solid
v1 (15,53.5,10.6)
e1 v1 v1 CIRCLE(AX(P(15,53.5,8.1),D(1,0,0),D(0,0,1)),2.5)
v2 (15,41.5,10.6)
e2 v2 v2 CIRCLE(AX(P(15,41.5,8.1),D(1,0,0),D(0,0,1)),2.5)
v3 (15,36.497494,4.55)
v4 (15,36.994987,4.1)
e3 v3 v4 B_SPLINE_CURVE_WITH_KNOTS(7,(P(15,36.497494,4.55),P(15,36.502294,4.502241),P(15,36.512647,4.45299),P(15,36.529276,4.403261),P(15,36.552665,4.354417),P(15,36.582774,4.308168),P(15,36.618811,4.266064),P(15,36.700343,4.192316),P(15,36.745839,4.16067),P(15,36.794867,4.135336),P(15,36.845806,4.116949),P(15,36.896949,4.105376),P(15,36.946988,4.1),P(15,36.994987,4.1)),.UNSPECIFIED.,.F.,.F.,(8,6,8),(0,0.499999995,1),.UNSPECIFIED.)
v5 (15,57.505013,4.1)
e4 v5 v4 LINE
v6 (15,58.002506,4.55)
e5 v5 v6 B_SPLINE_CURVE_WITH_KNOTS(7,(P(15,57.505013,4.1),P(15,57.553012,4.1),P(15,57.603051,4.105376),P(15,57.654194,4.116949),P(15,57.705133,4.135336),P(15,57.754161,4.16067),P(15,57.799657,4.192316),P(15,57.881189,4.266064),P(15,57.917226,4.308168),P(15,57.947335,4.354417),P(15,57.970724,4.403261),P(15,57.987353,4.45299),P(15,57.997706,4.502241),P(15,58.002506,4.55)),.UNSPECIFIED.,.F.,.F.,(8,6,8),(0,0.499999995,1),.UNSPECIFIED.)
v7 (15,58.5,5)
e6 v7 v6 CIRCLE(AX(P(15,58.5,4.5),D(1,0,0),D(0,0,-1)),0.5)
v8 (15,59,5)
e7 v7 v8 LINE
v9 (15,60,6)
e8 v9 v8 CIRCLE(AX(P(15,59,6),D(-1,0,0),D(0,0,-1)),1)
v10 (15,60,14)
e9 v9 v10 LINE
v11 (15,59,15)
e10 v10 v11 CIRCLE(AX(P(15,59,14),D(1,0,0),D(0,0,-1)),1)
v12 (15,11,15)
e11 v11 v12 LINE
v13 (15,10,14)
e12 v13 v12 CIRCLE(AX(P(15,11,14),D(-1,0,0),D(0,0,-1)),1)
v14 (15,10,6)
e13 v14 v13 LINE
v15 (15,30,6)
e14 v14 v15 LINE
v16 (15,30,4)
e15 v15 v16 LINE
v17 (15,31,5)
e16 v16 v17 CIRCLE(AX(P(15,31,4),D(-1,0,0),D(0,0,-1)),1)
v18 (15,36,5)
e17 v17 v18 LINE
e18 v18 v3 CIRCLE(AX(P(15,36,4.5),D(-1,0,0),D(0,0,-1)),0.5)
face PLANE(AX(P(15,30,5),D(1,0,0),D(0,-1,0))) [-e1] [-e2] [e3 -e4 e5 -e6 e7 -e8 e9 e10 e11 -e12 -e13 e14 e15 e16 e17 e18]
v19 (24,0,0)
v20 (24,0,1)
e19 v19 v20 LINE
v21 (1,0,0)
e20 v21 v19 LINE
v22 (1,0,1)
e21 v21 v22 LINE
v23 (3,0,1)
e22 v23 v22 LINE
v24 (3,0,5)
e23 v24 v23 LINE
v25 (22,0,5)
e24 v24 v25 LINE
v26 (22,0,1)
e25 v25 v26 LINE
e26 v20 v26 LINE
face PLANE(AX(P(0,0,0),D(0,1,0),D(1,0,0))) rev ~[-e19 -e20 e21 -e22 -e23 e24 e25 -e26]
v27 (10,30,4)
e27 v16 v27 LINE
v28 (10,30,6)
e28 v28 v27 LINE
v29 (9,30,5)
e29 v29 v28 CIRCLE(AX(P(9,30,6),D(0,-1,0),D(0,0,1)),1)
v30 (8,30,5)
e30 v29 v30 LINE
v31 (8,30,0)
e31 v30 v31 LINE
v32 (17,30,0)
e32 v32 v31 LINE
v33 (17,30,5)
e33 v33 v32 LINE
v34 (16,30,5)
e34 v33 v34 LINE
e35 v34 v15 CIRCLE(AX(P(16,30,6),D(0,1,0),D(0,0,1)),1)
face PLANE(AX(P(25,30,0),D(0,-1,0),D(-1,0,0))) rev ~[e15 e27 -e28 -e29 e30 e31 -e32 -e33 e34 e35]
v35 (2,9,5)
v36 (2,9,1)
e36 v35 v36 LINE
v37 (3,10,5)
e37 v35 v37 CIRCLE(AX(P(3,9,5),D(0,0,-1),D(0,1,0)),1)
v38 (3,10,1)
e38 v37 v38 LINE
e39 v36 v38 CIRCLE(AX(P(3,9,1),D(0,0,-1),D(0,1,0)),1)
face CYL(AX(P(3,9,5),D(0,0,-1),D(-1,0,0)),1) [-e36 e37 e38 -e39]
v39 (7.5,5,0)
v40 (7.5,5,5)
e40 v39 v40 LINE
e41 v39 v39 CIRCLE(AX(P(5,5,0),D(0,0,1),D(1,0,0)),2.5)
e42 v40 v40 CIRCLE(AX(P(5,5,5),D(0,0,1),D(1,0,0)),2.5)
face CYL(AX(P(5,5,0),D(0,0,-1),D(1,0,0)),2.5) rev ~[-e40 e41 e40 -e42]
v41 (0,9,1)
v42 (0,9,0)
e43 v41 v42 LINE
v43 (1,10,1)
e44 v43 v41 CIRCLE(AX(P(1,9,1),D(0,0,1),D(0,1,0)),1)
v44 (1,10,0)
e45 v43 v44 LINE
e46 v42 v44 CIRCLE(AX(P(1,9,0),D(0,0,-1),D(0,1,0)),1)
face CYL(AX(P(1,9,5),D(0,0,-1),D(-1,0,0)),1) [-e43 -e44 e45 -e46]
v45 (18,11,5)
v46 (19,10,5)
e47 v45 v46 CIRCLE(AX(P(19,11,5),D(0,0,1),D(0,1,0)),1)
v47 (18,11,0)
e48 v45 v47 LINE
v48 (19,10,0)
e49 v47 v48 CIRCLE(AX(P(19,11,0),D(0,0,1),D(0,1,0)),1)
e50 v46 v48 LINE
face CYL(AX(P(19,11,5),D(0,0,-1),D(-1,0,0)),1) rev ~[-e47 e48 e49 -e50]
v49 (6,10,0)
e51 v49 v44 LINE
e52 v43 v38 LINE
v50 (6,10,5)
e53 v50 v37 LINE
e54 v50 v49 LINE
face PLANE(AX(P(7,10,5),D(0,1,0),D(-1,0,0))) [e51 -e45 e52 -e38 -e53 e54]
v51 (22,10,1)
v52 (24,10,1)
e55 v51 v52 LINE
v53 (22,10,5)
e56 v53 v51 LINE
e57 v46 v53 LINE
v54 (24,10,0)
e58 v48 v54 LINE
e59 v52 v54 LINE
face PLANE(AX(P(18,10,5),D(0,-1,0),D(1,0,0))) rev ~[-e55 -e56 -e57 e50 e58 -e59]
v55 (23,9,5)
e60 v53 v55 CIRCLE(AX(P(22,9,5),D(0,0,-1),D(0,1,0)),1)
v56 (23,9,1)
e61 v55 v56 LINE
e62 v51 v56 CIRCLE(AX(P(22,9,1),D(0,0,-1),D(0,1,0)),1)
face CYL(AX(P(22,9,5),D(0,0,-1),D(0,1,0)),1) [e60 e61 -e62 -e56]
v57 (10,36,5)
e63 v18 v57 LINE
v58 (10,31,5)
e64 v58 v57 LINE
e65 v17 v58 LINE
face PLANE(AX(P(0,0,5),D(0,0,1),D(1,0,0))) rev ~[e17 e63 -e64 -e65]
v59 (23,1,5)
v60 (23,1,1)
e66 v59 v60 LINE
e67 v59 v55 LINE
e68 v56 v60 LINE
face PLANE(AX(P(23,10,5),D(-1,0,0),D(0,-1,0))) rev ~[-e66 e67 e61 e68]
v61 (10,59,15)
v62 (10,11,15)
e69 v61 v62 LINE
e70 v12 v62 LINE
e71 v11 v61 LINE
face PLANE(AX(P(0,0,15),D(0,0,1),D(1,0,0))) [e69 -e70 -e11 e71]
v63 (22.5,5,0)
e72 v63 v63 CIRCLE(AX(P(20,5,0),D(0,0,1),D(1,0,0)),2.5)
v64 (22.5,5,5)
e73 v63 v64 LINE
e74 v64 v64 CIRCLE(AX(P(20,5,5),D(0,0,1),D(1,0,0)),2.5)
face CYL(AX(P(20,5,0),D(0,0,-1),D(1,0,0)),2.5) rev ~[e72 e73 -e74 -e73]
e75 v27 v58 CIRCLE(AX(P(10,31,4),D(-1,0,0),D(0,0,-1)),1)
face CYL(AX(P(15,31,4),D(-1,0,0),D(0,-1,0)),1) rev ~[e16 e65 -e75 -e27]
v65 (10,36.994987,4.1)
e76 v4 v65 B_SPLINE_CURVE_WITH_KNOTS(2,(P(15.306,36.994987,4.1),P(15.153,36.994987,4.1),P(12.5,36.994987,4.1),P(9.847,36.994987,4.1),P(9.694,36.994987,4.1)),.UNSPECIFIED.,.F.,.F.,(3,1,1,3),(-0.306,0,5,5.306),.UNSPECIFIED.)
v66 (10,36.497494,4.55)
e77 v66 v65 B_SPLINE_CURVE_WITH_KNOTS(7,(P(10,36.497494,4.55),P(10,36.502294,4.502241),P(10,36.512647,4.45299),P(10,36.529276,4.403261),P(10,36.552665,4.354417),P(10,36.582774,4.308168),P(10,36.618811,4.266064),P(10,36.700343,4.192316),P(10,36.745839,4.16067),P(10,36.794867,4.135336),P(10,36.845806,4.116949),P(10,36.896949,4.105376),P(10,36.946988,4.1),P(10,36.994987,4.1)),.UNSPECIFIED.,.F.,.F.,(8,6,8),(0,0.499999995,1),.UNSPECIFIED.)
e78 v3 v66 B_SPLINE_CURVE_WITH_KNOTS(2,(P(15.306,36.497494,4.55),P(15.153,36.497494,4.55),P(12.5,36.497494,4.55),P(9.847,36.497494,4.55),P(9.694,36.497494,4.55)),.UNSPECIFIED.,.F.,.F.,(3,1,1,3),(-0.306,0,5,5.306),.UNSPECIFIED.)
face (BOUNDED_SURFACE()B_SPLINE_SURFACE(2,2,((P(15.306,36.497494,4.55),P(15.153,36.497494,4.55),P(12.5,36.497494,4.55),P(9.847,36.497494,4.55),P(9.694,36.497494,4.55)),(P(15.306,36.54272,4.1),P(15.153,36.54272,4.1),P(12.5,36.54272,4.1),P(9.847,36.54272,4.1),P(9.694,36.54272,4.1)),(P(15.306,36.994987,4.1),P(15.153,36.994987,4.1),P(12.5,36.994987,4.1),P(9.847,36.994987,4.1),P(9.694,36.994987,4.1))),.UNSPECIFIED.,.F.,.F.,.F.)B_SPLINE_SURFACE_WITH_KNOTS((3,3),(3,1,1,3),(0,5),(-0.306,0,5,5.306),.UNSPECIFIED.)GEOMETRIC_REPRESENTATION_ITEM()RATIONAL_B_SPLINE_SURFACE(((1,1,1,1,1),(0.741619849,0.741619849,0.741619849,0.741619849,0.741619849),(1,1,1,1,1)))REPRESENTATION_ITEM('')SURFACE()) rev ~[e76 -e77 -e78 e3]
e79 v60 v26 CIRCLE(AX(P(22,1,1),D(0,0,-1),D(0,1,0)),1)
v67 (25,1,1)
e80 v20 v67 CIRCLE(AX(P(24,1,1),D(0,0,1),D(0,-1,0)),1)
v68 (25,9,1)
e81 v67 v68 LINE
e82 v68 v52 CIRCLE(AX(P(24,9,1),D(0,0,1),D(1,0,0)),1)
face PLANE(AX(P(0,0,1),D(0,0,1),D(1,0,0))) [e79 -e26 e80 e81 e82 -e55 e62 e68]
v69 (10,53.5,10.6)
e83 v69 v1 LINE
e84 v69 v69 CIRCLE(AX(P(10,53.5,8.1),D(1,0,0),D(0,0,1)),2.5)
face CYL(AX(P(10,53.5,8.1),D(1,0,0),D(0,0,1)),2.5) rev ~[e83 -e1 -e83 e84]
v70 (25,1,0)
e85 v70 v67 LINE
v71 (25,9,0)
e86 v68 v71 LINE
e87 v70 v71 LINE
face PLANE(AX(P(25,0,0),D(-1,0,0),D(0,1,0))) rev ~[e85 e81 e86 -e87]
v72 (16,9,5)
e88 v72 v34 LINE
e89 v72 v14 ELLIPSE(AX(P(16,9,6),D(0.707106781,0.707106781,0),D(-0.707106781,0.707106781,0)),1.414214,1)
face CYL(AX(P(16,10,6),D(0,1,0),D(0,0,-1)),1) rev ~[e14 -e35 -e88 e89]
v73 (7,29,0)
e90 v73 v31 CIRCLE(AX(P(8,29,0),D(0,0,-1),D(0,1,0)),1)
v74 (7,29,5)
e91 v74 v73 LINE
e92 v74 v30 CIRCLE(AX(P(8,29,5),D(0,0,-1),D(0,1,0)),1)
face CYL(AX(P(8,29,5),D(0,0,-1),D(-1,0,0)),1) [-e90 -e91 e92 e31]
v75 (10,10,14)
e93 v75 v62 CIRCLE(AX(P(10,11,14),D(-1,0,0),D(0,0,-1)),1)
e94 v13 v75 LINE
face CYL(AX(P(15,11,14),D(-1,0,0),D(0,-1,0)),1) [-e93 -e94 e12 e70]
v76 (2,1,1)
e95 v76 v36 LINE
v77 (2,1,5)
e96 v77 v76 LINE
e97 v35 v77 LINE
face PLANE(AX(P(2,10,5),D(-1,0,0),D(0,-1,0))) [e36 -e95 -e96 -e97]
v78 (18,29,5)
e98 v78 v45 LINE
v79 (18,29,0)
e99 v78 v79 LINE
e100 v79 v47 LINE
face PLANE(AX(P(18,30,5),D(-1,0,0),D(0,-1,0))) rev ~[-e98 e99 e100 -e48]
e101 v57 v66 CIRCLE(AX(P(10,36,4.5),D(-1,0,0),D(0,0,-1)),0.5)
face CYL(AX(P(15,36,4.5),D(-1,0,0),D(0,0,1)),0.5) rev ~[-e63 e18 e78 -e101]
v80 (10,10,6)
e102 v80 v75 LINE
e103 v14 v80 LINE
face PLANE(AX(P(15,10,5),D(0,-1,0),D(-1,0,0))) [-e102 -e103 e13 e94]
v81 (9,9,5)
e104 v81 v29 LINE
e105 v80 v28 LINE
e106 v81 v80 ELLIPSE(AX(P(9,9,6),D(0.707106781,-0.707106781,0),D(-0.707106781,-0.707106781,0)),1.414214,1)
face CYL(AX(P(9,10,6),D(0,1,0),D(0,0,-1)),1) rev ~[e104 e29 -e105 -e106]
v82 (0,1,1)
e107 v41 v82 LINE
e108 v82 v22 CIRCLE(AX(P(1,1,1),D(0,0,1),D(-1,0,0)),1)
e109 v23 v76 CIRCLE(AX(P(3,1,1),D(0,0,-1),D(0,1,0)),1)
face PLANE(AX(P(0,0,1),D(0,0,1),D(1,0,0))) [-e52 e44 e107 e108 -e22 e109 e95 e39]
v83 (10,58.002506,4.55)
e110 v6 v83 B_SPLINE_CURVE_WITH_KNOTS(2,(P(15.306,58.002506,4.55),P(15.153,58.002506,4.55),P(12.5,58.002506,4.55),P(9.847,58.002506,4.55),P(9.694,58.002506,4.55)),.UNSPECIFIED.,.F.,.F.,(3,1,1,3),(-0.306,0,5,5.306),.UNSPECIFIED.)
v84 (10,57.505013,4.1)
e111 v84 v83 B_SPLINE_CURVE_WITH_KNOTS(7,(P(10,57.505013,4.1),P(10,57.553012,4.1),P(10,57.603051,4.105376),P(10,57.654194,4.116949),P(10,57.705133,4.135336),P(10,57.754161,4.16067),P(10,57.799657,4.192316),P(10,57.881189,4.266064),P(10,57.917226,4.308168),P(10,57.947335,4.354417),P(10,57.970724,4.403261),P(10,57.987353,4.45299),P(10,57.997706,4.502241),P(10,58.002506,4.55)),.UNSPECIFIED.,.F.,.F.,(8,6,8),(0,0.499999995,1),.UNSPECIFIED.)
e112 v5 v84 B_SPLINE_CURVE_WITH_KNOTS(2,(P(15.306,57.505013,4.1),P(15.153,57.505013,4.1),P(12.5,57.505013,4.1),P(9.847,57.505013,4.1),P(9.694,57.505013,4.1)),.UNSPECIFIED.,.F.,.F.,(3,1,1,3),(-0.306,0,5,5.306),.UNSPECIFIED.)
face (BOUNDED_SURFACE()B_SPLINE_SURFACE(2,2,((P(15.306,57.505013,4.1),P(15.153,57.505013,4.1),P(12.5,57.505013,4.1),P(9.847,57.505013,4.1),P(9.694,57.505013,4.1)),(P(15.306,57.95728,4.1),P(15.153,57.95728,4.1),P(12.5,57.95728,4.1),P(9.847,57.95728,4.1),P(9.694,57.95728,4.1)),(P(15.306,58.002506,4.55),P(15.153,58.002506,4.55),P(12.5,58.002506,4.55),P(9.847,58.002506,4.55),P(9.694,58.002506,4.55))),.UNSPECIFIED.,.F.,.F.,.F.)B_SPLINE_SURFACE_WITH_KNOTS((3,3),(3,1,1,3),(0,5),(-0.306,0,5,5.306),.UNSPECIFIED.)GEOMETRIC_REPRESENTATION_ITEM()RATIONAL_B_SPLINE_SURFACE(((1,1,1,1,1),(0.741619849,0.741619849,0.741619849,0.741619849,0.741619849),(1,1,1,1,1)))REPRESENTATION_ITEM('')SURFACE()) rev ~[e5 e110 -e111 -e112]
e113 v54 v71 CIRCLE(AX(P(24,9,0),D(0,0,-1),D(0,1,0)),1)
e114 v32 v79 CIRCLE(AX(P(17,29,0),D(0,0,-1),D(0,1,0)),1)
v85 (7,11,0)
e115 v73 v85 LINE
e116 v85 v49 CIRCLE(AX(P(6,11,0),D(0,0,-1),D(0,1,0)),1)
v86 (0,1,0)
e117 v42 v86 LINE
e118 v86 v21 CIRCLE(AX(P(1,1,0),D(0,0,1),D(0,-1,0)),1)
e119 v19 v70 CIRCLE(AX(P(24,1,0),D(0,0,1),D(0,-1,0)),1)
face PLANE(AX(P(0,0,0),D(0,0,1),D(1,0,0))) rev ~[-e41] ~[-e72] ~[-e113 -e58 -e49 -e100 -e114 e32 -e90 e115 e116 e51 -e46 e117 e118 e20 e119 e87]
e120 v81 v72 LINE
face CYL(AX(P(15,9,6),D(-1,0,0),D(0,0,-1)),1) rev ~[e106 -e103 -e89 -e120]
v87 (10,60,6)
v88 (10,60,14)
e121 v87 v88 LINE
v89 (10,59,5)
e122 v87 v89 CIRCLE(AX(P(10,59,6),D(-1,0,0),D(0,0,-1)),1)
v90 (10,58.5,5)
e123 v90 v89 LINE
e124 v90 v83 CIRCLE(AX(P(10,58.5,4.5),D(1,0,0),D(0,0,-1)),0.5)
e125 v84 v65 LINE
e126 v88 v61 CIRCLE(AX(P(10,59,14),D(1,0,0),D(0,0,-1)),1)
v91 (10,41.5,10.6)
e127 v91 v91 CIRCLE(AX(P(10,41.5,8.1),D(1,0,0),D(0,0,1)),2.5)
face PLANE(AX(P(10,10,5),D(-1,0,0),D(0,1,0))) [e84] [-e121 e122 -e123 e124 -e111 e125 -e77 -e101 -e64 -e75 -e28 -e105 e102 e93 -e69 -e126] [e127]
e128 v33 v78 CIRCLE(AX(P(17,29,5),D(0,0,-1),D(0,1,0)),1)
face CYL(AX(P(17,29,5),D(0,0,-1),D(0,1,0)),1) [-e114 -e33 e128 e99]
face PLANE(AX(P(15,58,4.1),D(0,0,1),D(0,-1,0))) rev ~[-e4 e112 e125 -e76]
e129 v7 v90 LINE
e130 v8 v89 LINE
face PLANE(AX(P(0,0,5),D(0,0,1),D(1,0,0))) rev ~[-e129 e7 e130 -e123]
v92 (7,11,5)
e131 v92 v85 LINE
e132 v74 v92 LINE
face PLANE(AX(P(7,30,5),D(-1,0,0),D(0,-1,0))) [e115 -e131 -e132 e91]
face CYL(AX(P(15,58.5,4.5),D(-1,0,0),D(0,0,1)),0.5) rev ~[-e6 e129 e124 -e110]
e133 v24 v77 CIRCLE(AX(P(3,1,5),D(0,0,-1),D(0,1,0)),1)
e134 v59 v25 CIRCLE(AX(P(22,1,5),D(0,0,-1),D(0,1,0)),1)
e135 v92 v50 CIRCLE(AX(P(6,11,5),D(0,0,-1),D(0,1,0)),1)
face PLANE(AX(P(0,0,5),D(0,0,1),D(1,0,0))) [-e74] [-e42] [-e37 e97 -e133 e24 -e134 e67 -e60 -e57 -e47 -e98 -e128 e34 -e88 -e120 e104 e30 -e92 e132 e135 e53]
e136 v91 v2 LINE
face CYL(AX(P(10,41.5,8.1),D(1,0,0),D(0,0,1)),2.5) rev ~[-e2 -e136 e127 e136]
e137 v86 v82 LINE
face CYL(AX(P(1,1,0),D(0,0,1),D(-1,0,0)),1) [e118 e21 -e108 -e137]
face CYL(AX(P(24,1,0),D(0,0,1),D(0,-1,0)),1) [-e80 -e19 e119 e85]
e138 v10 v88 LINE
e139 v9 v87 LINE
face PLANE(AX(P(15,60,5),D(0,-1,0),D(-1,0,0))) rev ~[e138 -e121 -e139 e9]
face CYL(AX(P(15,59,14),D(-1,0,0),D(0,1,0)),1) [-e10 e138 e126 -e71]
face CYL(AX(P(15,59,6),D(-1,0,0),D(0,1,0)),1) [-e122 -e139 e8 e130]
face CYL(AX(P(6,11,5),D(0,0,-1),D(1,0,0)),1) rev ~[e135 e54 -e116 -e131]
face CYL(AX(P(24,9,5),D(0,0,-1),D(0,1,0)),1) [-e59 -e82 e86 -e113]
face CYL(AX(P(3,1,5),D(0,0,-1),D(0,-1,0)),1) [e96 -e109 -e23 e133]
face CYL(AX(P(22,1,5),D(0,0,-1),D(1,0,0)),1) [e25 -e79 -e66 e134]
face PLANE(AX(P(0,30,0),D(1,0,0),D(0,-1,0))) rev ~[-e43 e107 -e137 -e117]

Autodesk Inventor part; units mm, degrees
ref_plane "YZ Plane" through (0, 0, 0) normal (1, 0, 0) x (0, 1, 0)
ref_plane "XZ Plane" through (0, 0, 0) normal (0, 1, 0) x (-1, 0, 0)
ref_plane "XY Plane" through (0, 0, 0) normal (0, 0, 1) x (1, 0, 0)
sketch "スケッチ6" plane through (0, 0, 0) normal (0, 0, 1) x (1, 0, 0)
  line L0 (0, 0) -> (25, 0)
  line L1 (25, 0) -> (25, 30)
  line L2 (25, 30) -> (0, 30)
  line L3 (0, 30) -> (0, 0)
  circle A0 centre (5, 5) radius 2.5
  circle A1 centre (20, 5) radius 2.5
  dimension "d39" = 5
  dimension "d40" = 5
  dimension "d41" = 5
  dimension "d42" = 5
  dimension "d43" = 15
  dimension "d44" = 5
  dimension "d45" = 5
  dimension "d46" = 30
extrude "押し出し4" add sketch "スケッチ6" along normal blind 5
sketch "スケッチ7" plane through (0, 0, 5) normal (0, 0, 1) x (1, 0, 0)
  line L0 (25, 30) -> (0, 30) projected
  line L1 (10, 30) -> (15, 30)
  line L2 (15, 30) -> (15, 10)
  line L3 (15, 10) -> (10, 10)
  line L4 (10, 10) -> (10, 30)
  line L5 (25, 0) -> (25, 30) projected
  line L6 (0, 30) -> (0, 0) projected
  line L7 (0, 0) -> (25, 0) projected
  line L8 (10, 30) -> (15, 30)
  line L9 (15, 30) -> (15, 60)
  line L10 (15, 60) -> (10, 60)
  line L11 (10, 60) -> (10, 30)
  dimension "d49" = 5
  dimension "d50" = 10
  dimension "d51" = 10
  dimension "d52" = 10
  dimension "d55" = 30
  dimension "d56" = 5
extrude "押し出し5" add sketch "スケッチ7" along normal blind 10 contours L2 L3 L4 L0 | L0 L11 L10 L9
sketch "スケッチ8" plane through (10, 30, 5) normal (-1, 0, 0) x (0, 0, 1)
  line L0 (10, 30) -> (10, -20) projected
  line L1 (0, 30) -> (10, 30) projected
  line L2 (0, -20) -> (10, -20) projected
  point P0 (-5, -30)
  point P1 (3.1, 11.5)
  point P2 (3.1, 23.5)
  dimension "d57" = 6.9
  dimension "d58" = 6.9
  dimension "d59" = 12
  dimension "d60" = 6.5
  dimension "d61" = 31.5
hole "穴3" at (10, 41.5, 8.1) at (10, 53.5, 8.1) direction (1, 0, 0) diameter 5 depth 8
sketch "スケッチ9" plane through (0, 0, 5) normal (0, 0, 1) x (1, 0, 0)
  line L0 (10, 30) -> (0, 30) projected
  line L1 (0, 30) -> (7, 30)
  line L2 (7, 30) -> (7, 10)
  line L3 (7, 10) -> (0, 10)
  line L4 (0, 10) -> (0, 30)
  line L5 (25, 0) -> (25, 30) projected
  line L6 (25, 30) -> (18, 30)
  line L7 (18, 30) -> (18, 10)
  line L8 (18, 10) -> (25, 10)
  line L9 (25, 10) -> (25, 30)
  point P0 (0, 0)
  point P1 (5, 30)
  point P2 (18, 20)
  point P3 (7, 20)
  dimension "d70" = 20
  dimension "d72" = 7
  dimension "d73" = 7
extrude "押し出し6" cut sketch "スケッチ9" against normal blind 10
fillet "フィレット4" radius 1 15 edges at (7, 30, 2.5) (12.5, 60, 5) (12.5, 60, 15) (12.5, 10, 15) (7, 10, 2.5) (0, 10, 2.5) (0, 0, 2.5) (18, 30, 2.5) (18, 10, 2.5) (25, 10, 2.5) (25, 0, 2.5) (10, 20, 5) (12.5, 30, 5) (15, 20, 5) (12.5, 10, 5)
sketch "スケッチ10" plane through (0, 0, 5) normal (0, 0, 1) x (1, 0, 0)
  line L0 (9, 30) -> (9, 9) projected
  line L1 (9, 30) -> (8, 30) projected
  arc A0 (8, 30) -> (7, 29) centre (8, 29) ccw projected
  line L2 (7, 29) -> (7, 11) projected
  arc A1 (6, 10) -> (7, 11) centre (6, 11) ccw projected
  line L3 (6, 10) -> (1, 10) projected
  arc A2 (1, 10) -> (0, 9) centre (1, 9) ccw projected
  line L4 (0, 9) -> (0, 1) projected
  arc A3 (0, 1) -> (1, 0) centre (1, 1) ccw projected
  line L5 (1, 0) -> (24, 0) projected
  arc A4 (24, 0) -> (25, 1) centre (24, 1) ccw projected
  line L6 (25, 1) -> (25, 9) projected
  arc A5 (25, 9) -> (24, 10) centre (24, 9) ccw projected
  line L7 (24, 10) -> (19, 10) projected
  arc A6 (18, 11) -> (19, 10) centre (19, 11) ccw projected
  line L8 (18, 11) -> (18, 29) projected
  arc A7 (18, 29) -> (17, 30) centre (17, 29) ccw projected
  line L9 (17, 30) -> (16, 30) projected
  line L10 (16, 9) -> (16, 30) projected
  line L11 (9, 9) -> (16, 9) projected
  circle A8 centre (5, 5) radius 2.5 projected
  circle A9 centre (20, 5) radius 2.5 projected
  line L12 (2, 8) -> (23, 8)
  line L13 (23, 8) -> (23, 2)
  line L14 (23, 2) -> (2, 2)
  line L15 (2, 2) -> (2, 8)
  line L16 (2, 10) -> (2, 0)
  line L17 (24, 10) -> (19, 10) projected
  line L18 (23, 10) -> (23, 0)
  point P0 (0, 0)
  point P1 (2, 2)
  point P2 (23, 2)
  dimension "d77" = 2
  dimension "d78" = 2
  dimension "d79" = 2
  dimension "d80" = 2
extrude "押し出し7" cut sketch "スケッチ10" against normal blind 4 contours L16 L15 L5 A3 L4 A2 L3 | L18 L7 A5 L6 A4 L5 L13
fillet "フィレット5" radius 1 4 edges at (23, 10, 3) (23, 0, 3) (2, 10, 3) (2, 0, 3)
sketch "スケッチ11" plane through (15, 31, 5) normal (1, 0, 0) x (0, 0, -1)
  line L0 (-7.1, 27) -> (2, 27)
  line L1 (2, 5.5) -> (-7.1, 5.5)
  line L2 (-7.1, 5.5) -> (-7.1, 27)
  line L3 (0, 0) -> (0, 28) projected
  circle A0 centre (-3.1, 22.5) radius 2.5 projected
  line L4 (-7.1, 27) -> (0.9, 27)
  line L5 (0.9, 27) -> (0.9, 5.5)
  line L6 (0.9, 5.5) -> (-7.1, 5.5)
  line L7 (-7.1, 5.5) -> (-7.1, 27)
  line L8 (-1, 29) -> (-9, 29) projected
  circle A1 centre (-3.1, 10.5) radius 2.5 projected
  point P0 (5, -31)
  point P1 (0.9, 27)
  point P2 (0, 27)
  point P3 (0, 5.5)
  dimension "d85" = 4
  dimension "d86" = 4
  dimension "d87" = 2
  dimension "d88" = 5
extrude "押し出し8" add sketch "スケッチ11" against normal blind 5 contours L0 L5 L1 L3
fillet "フィレット6" radius 0.5 4 edges at (12.5, 36.5, 5) (12.5, 36.5, 4.1) (12.5, 58, 4.1) (12.5, 58, 5)
equation "\"d42\" = d41"
equation "\"d45\" = d44"
equation "\"d58\" = d57"
equation "\"d73\" = d72"
equation "\"d86\" = d85"
properties part number "BP_BOX-Support-Bar-Connect1-40" material "ABS プラスチック"
